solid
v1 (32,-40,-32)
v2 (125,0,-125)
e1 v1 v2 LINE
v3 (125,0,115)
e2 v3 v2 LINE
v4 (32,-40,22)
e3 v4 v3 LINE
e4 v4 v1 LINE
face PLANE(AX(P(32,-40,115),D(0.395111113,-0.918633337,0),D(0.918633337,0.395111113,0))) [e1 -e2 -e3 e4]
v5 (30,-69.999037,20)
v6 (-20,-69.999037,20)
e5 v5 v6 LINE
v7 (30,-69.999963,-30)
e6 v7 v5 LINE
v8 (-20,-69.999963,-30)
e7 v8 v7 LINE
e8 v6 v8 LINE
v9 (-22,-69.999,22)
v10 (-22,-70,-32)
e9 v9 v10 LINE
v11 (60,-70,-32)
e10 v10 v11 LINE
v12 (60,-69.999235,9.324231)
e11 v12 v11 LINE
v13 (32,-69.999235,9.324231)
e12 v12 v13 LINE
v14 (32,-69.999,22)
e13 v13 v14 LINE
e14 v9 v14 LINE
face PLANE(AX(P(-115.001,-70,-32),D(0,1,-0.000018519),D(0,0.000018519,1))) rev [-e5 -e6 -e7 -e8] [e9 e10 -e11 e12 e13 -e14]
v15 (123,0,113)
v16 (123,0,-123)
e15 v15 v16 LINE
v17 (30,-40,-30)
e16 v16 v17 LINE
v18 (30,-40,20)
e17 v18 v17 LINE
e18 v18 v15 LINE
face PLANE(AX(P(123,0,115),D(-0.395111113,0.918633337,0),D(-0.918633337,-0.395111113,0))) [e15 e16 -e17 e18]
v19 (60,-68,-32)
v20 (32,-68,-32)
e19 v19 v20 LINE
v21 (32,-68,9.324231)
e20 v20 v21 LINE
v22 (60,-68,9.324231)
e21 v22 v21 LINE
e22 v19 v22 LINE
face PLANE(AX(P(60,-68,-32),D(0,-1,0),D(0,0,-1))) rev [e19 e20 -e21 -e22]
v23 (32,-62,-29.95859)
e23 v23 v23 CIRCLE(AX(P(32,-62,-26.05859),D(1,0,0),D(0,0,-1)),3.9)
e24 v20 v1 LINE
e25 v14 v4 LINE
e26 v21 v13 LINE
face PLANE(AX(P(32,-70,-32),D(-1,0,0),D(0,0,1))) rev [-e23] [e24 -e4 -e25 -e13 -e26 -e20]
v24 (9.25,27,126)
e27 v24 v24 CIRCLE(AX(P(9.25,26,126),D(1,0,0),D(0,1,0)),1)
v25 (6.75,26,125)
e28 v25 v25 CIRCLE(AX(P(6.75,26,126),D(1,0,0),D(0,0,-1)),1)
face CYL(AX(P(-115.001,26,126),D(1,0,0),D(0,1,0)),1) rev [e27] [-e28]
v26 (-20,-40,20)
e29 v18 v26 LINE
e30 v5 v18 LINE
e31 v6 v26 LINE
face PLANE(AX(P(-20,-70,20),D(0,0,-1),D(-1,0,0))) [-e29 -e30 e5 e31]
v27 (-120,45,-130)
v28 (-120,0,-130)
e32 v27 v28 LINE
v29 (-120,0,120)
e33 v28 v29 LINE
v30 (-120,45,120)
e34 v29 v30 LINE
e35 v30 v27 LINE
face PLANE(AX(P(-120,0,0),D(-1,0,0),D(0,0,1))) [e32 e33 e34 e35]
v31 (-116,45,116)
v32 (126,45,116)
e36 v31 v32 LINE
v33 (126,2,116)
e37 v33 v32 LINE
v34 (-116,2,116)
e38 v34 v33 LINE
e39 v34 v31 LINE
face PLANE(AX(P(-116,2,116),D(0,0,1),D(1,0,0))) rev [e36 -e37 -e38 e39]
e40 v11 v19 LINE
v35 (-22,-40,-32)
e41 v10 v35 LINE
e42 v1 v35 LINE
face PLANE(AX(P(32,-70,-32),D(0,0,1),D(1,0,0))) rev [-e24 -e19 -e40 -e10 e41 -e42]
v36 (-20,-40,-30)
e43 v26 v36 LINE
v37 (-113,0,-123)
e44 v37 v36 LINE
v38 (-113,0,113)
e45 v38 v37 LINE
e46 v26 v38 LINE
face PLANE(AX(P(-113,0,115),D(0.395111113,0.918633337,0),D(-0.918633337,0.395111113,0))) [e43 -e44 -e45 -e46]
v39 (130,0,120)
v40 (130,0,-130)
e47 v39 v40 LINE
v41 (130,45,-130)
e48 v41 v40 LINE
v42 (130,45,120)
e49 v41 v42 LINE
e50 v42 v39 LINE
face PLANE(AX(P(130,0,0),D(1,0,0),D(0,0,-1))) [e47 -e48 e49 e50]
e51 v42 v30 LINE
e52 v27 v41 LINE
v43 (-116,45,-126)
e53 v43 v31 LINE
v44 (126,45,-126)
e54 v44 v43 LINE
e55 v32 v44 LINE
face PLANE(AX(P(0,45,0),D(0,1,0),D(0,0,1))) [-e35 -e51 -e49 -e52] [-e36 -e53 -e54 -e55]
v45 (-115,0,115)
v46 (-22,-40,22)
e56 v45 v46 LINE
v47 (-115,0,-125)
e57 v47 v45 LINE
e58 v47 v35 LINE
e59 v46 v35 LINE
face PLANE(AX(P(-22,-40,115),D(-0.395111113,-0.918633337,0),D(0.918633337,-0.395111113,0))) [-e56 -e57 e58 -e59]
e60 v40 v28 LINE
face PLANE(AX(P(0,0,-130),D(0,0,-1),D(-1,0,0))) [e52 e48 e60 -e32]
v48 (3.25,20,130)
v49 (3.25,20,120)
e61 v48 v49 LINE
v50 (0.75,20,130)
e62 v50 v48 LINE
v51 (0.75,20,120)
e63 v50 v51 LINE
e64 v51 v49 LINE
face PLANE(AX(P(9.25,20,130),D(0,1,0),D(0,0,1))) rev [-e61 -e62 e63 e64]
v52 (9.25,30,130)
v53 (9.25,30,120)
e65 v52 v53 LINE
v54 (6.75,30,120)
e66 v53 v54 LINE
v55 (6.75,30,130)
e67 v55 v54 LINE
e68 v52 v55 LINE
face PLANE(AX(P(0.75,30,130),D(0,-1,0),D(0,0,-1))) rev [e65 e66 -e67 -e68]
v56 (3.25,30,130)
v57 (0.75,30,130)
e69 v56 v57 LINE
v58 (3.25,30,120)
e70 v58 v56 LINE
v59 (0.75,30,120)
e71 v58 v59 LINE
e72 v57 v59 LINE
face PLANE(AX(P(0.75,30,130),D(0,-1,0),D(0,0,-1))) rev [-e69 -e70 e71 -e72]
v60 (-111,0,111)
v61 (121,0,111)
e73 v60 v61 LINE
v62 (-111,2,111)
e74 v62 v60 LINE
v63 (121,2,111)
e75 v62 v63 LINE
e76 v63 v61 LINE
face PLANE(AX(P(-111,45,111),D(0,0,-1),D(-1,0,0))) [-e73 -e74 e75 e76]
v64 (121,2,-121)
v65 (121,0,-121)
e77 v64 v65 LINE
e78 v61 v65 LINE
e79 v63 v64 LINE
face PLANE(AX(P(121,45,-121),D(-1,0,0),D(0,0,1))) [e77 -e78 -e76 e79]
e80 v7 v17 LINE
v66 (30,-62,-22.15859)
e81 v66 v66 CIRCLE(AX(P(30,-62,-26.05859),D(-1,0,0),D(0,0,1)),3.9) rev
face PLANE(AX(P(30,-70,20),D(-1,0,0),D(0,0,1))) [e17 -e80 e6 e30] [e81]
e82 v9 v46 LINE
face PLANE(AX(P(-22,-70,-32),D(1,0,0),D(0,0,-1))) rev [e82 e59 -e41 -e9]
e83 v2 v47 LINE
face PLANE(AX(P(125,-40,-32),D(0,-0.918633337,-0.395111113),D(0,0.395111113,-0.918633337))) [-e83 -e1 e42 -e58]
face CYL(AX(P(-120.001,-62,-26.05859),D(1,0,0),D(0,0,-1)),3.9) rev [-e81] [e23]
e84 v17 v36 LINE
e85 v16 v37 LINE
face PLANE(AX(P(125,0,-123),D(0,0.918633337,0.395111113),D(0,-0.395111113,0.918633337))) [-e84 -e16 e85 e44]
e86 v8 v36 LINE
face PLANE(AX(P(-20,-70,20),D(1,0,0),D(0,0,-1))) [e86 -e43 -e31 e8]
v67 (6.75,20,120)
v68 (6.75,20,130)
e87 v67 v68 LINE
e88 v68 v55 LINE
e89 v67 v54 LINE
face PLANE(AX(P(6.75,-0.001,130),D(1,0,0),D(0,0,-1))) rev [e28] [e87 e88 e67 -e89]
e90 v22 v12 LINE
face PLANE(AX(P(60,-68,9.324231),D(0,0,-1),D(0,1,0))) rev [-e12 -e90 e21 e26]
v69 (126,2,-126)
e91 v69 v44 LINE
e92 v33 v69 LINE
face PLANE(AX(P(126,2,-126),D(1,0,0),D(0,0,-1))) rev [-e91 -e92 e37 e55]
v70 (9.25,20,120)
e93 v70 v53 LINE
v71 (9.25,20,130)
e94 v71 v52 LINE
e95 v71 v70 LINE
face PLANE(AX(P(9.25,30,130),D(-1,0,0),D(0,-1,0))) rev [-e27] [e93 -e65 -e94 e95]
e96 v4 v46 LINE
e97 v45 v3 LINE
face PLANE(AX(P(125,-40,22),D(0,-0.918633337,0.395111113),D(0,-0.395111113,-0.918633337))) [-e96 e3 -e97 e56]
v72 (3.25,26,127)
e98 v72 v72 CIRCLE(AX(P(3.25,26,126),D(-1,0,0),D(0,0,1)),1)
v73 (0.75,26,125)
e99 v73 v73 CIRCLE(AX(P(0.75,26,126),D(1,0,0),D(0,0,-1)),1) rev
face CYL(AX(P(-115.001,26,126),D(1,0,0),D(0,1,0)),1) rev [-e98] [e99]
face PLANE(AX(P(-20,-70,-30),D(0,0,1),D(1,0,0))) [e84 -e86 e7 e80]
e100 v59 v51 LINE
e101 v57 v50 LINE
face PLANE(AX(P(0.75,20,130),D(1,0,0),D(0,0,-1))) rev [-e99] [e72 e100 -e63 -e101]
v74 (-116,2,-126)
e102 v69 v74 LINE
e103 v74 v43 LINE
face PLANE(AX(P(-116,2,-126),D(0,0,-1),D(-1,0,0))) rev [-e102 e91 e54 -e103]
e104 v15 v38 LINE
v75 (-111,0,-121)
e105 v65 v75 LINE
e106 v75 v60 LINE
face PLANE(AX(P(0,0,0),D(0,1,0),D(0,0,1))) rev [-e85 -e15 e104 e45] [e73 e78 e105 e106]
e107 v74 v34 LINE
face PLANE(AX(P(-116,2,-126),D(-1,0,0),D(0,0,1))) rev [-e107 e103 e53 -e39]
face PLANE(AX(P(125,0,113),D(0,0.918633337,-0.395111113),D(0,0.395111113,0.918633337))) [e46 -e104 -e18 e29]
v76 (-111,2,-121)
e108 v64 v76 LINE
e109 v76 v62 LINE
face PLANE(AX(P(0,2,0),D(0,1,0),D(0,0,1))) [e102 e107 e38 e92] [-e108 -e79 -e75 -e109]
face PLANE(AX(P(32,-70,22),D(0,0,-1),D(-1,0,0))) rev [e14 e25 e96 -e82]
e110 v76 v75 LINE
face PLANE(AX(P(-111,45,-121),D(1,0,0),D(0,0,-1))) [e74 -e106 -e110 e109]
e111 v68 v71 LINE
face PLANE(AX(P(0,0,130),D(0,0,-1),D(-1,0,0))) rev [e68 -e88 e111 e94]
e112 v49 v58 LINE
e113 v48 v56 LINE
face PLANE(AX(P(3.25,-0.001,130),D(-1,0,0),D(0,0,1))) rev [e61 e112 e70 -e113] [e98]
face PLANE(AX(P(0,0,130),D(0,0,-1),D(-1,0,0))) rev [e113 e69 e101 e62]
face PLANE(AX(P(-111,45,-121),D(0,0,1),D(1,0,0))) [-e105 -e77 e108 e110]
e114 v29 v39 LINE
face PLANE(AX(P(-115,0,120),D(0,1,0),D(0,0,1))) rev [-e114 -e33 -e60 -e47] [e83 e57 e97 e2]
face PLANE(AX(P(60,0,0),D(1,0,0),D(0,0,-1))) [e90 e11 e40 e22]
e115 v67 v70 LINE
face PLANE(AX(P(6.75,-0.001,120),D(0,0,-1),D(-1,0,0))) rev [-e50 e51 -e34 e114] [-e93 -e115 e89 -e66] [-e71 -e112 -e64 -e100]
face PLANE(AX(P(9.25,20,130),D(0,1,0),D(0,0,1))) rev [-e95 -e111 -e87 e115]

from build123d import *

# Parameters (mm, degrees)
CROQUIS2_W               = 240
CROQUIS2_H               = 240
CROQUIS2_W_2             = 232
CROQUIS2_H_2             = 232
SALIENTE_EXTRUIR1_DEPTH  = 45
CROQUIS4_W               = 8.5
CROQUIS4_H               = 10
SALIENTE_EXTRUIR2_DEPTH  = 15
CORTAR_EXTRUIR1_REACH    = 187.373
CROQUIS5_R               = 1
CORTAR_EXTRUIR2_REACH    = 187.876
CROQUIS6_W               = 3.5
CROQUIS6_H               = 10
SALIENTE_EXTRUIR3_DEPTH  = 240
CORTAR_EXTRUIR3_DEPTH    = 250
SALIENTE_EXTRUIR4_DEPTH  = 240
CORTAR_EXTRUIR4_DEPTH    = 250
CROQUIS11_W              = 54
CROQUIS11_H              = 54
CROQUIS11_W_2            = 50
CROQUIS11_H_2            = 50
SALIENTE_EXTRUIR5_DEPTH  = 30
CORTAR_EXTRUIR5_START    = -54
CORTAR_EXTRUIR5_DEPTH    = 54
CROQUIS14_W              = 240
CROQUIS14_H              = 45
SALIENTE_EXTRUIR6_DEPTH  = 5
CROQUIS15_W              = 245
CROQUIS15_H              = 45
SALIENTE_EXTRUIR7_DEPTH  = 5
CROQUIS16_W              = 245
CROQUIS16_H              = 45
SALIENTE_EXTRUIR8_DEPTH  = 5
CROQUIS17_W              = 250
CROQUIS17_H              = 45
SALIENTE_EXTRUIR9_DEPTH  = 5
CROQUIS18_W              = 242
CROQUIS18_H              = 242
CORTAR_EXTRUIR6_DEPTH    = 43
SALIENTE_EXTRUIR10_DEPTH = 28
CORTAR_EXTRUIR7_REACH    = 213.906
CROQUIS20_R              = 3.9


# Read off the part's stored shape, not the designer's step: Cortar-Extruir5
with BuildPart() as part:
    # Croquis2 → Saliente-Extruir1 (new body)
    with BuildSketch(Plane(origin=(0, 0, 0), x_dir=(1, 0, 0), z_dir=(0, 1, 0))):
        with Locations((5, 5)):
            Rectangle(CROQUIS2_W, CROQUIS2_H)
        with Locations((5, 5)):
            Rectangle(CROQUIS2_W_2, CROQUIS2_H_2, mode=Mode.SUBTRACT)
    extrude(amount=SALIENTE_EXTRUIR1_DEPTH)

    # Croquis4 → Saliente-Extruir2 (add)
    with BuildSketch(Plane.XY.offset(115)):
        with Locations((5, 25)):
            Rectangle(CROQUIS4_W, CROQUIS4_H)
    extrude(amount=SALIENTE_EXTRUIR2_DEPTH)

    # Croquis5 → Cortar-Extruir1 (cut, up to next)
    with BuildSketch(Plane(origin=(9.25, 0, 0), x_dir=(0, 0, -1), z_dir=(1, 0, 0)), mode=Mode.PRIVATE) as cortar_extruir1_sk1:
        with Locations(Location((-126, 26, 0), (0, 0, 90))):
            Circle(CROQUIS5_R)
    cortar_extruir1_tool1 = extrude(cortar_extruir1_sk1.sketch, amount=-CORTAR_EXTRUIR1_REACH, mode=Mode.PRIVATE) & part.part
    add(cortar_extruir1_tool1.solids().sort_by_distance((9.25, 26, 126))[0], mode=Mode.SUBTRACT)

    # Croquis6 → Cortar-Extruir2 (cut, up to next)
    with BuildSketch(Plane(origin=(0, 45, 0), x_dir=(1, 0, 0), z_dir=(0, 1, 0)), mode=Mode.PRIVATE) as cortar_extruir2_sk1:
        with Locations((5, -125)):
            Rectangle(CROQUIS6_W, CROQUIS6_H)
    cortar_extruir2_tool1 = extrude(cortar_extruir2_sk1.sketch, amount=-CORTAR_EXTRUIR2_REACH, mode=Mode.PRIVATE) & part.part
    add(cortar_extruir2_tool1.solids().sort_by_distance((5, 45, 125))[0], mode=Mode.SUBTRACT)

    # Croquis7 → Saliente-Extruir3 (add)
    with BuildSketch(Plane.ZY.offset(115)):
        Polygon((113, 0), (115, 0), (22, -40), (20, -40), align=None)
        Polygon((-125, 0), (-123, 0), (-30, -40), (-32, -40), align=None)
    extrude(amount=-SALIENTE_EXTRUIR3_DEPTH)

    # Croquis8 → Cortar-Extruir3 (cut)
    with BuildSketch(Plane.XY.offset(115)):
        Polygon((123, 0), (30, -40), (125, -40), (125, 0), align=None)
        Polygon((-115, -40), (-20, -40), (-113, 0), (-115, 0), align=None)
    extrude(amount=-CORTAR_EXTRUIR3_DEPTH, mode=Mode.SUBTRACT)

    # Croquis9 → Saliente-Extruir4 (add)
    with BuildSketch(Plane(origin=(0, 0, -125), x_dir=(-1, 0, 0), z_dir=(0, 0, -1))):
        Polygon((20, -40), (22, -40), (115, 0), (113, 0), align=None)
        Polygon((-30, -40), (-32, -40), (-125, 0), (-123, 0), align=None)
    extrude(amount=-SALIENTE_EXTRUIR4_DEPTH)

    # Croquis10 → Cortar-Extruir4 (cut)
    with BuildSketch(Plane.ZY.offset(115)):
        Polygon((-125, -40), (-125, 0), (-32, -40), align=None)
        Polygon((22, -40), (115, -40), (115, 0), align=None)
    extrude(amount=-CORTAR_EXTRUIR4_DEPTH, mode=Mode.SUBTRACT)

    # Croquis11 → Saliente-Extruir5 (add)
    with BuildSketch(Plane.XZ.offset(40)):
        with Locations((5, -5)):
            Rectangle(CROQUIS11_W, CROQUIS11_H)
        with Locations((5, -5)):
            Rectangle(CROQUIS11_W_2, CROQUIS11_H_2, mode=Mode.SUBTRACT)
    extrude(amount=SALIENTE_EXTRUIR5_DEPTH)

    # Cortar-Extruir5 outline → Cortar-Extruir5 (cut)
    with BuildSketch(Plane(origin=(32, 0, 0), x_dir=(0, 0, -1), z_dir=(1, 0, 0)).offset(CORTAR_EXTRUIR5_START)):
        Polygon((-22, -70), (32, -70), (-22, -69.999), align=None)
    extrude(amount=CORTAR_EXTRUIR5_DEPTH, mode=Mode.SUBTRACT)

    # Croquis14 → Saliente-Extruir6 (add)
    with BuildSketch(Plane.XY.offset(115)):
        with Locations((5, 22.5)):
            Rectangle(CROQUIS14_W, CROQUIS14_H)
    extrude(amount=SALIENTE_EXTRUIR6_DEPTH)

    # Croquis15 → Saliente-Extruir7 (add)
    with BuildSketch(Plane(origin=(125, 0, 0), x_dir=(0, 0, -1), z_dir=(1, 0, 0))):
        with Locations((2.5, 22.5)):
            Rectangle(CROQUIS15_W, CROQUIS15_H)
    extrude(amount=SALIENTE_EXTRUIR7_DEPTH)

    # Croquis16 → Saliente-Extruir8 (add)
    with BuildSketch(Plane(origin=(0, 0, -125), x_dir=(-1, 0, 0), z_dir=(0, 0, -1))):
        with Locations((-7.5, 22.5)):
            Rectangle(CROQUIS16_W, CROQUIS16_H)
    extrude(amount=SALIENTE_EXTRUIR8_DEPTH)

    # Croquis17 → Saliente-Extruir9 (add)
    with BuildSketch(Plane.ZY.offset(115)):
        with Locations((-5, 22.5)):
            Rectangle(CROQUIS17_W, CROQUIS17_H)
    extrude(amount=SALIENTE_EXTRUIR9_DEPTH)

    # Croquis18 → Cortar-Extruir6 (cut)
    with BuildSketch(Plane(origin=(0, 45, 0), x_dir=(1, 0, 0), z_dir=(0, 1, 0))):
        with Locations((5, 5)):
            Rectangle(CROQUIS18_W, CROQUIS18_H)
    extrude(amount=-CORTAR_EXTRUIR6_DEPTH, mode=Mode.SUBTRACT)

    # Croquis19 → Saliente-Extruir10 (add)
    with BuildSketch(Plane(origin=(32, 0, 0), x_dir=(0, 0, -1), z_dir=(1, 0, 0))):
        Polygon((32, -70), (32, -68), (-9.324230876, -68), (-9.324230876, -69.999234736), align=None)
    extrude(amount=SALIENTE_EXTRUIR10_DEPTH)

    # Croquis20 → Cortar-Extruir7 (cut, up to next)
    with BuildSketch(Plane(origin=(32, 0, 0), x_dir=(0, 0, -1), z_dir=(1, 0, 0)), mode=Mode.PRIVATE) as cortar_extruir7_sk1:
        with Locations((26.058589575, -62)):
            Circle(CROQUIS20_R)
    cortar_extruir7_tool1 = extrude(cortar_extruir7_sk1.sketch, amount=-CORTAR_EXTRUIR7_REACH, mode=Mode.PRIVATE) & part.part
    add(cortar_extruir7_tool1.solids().sort_by_distance((32, -62, -26.05859))[0], mode=Mode.SUBTRACT)


solid = part.part
